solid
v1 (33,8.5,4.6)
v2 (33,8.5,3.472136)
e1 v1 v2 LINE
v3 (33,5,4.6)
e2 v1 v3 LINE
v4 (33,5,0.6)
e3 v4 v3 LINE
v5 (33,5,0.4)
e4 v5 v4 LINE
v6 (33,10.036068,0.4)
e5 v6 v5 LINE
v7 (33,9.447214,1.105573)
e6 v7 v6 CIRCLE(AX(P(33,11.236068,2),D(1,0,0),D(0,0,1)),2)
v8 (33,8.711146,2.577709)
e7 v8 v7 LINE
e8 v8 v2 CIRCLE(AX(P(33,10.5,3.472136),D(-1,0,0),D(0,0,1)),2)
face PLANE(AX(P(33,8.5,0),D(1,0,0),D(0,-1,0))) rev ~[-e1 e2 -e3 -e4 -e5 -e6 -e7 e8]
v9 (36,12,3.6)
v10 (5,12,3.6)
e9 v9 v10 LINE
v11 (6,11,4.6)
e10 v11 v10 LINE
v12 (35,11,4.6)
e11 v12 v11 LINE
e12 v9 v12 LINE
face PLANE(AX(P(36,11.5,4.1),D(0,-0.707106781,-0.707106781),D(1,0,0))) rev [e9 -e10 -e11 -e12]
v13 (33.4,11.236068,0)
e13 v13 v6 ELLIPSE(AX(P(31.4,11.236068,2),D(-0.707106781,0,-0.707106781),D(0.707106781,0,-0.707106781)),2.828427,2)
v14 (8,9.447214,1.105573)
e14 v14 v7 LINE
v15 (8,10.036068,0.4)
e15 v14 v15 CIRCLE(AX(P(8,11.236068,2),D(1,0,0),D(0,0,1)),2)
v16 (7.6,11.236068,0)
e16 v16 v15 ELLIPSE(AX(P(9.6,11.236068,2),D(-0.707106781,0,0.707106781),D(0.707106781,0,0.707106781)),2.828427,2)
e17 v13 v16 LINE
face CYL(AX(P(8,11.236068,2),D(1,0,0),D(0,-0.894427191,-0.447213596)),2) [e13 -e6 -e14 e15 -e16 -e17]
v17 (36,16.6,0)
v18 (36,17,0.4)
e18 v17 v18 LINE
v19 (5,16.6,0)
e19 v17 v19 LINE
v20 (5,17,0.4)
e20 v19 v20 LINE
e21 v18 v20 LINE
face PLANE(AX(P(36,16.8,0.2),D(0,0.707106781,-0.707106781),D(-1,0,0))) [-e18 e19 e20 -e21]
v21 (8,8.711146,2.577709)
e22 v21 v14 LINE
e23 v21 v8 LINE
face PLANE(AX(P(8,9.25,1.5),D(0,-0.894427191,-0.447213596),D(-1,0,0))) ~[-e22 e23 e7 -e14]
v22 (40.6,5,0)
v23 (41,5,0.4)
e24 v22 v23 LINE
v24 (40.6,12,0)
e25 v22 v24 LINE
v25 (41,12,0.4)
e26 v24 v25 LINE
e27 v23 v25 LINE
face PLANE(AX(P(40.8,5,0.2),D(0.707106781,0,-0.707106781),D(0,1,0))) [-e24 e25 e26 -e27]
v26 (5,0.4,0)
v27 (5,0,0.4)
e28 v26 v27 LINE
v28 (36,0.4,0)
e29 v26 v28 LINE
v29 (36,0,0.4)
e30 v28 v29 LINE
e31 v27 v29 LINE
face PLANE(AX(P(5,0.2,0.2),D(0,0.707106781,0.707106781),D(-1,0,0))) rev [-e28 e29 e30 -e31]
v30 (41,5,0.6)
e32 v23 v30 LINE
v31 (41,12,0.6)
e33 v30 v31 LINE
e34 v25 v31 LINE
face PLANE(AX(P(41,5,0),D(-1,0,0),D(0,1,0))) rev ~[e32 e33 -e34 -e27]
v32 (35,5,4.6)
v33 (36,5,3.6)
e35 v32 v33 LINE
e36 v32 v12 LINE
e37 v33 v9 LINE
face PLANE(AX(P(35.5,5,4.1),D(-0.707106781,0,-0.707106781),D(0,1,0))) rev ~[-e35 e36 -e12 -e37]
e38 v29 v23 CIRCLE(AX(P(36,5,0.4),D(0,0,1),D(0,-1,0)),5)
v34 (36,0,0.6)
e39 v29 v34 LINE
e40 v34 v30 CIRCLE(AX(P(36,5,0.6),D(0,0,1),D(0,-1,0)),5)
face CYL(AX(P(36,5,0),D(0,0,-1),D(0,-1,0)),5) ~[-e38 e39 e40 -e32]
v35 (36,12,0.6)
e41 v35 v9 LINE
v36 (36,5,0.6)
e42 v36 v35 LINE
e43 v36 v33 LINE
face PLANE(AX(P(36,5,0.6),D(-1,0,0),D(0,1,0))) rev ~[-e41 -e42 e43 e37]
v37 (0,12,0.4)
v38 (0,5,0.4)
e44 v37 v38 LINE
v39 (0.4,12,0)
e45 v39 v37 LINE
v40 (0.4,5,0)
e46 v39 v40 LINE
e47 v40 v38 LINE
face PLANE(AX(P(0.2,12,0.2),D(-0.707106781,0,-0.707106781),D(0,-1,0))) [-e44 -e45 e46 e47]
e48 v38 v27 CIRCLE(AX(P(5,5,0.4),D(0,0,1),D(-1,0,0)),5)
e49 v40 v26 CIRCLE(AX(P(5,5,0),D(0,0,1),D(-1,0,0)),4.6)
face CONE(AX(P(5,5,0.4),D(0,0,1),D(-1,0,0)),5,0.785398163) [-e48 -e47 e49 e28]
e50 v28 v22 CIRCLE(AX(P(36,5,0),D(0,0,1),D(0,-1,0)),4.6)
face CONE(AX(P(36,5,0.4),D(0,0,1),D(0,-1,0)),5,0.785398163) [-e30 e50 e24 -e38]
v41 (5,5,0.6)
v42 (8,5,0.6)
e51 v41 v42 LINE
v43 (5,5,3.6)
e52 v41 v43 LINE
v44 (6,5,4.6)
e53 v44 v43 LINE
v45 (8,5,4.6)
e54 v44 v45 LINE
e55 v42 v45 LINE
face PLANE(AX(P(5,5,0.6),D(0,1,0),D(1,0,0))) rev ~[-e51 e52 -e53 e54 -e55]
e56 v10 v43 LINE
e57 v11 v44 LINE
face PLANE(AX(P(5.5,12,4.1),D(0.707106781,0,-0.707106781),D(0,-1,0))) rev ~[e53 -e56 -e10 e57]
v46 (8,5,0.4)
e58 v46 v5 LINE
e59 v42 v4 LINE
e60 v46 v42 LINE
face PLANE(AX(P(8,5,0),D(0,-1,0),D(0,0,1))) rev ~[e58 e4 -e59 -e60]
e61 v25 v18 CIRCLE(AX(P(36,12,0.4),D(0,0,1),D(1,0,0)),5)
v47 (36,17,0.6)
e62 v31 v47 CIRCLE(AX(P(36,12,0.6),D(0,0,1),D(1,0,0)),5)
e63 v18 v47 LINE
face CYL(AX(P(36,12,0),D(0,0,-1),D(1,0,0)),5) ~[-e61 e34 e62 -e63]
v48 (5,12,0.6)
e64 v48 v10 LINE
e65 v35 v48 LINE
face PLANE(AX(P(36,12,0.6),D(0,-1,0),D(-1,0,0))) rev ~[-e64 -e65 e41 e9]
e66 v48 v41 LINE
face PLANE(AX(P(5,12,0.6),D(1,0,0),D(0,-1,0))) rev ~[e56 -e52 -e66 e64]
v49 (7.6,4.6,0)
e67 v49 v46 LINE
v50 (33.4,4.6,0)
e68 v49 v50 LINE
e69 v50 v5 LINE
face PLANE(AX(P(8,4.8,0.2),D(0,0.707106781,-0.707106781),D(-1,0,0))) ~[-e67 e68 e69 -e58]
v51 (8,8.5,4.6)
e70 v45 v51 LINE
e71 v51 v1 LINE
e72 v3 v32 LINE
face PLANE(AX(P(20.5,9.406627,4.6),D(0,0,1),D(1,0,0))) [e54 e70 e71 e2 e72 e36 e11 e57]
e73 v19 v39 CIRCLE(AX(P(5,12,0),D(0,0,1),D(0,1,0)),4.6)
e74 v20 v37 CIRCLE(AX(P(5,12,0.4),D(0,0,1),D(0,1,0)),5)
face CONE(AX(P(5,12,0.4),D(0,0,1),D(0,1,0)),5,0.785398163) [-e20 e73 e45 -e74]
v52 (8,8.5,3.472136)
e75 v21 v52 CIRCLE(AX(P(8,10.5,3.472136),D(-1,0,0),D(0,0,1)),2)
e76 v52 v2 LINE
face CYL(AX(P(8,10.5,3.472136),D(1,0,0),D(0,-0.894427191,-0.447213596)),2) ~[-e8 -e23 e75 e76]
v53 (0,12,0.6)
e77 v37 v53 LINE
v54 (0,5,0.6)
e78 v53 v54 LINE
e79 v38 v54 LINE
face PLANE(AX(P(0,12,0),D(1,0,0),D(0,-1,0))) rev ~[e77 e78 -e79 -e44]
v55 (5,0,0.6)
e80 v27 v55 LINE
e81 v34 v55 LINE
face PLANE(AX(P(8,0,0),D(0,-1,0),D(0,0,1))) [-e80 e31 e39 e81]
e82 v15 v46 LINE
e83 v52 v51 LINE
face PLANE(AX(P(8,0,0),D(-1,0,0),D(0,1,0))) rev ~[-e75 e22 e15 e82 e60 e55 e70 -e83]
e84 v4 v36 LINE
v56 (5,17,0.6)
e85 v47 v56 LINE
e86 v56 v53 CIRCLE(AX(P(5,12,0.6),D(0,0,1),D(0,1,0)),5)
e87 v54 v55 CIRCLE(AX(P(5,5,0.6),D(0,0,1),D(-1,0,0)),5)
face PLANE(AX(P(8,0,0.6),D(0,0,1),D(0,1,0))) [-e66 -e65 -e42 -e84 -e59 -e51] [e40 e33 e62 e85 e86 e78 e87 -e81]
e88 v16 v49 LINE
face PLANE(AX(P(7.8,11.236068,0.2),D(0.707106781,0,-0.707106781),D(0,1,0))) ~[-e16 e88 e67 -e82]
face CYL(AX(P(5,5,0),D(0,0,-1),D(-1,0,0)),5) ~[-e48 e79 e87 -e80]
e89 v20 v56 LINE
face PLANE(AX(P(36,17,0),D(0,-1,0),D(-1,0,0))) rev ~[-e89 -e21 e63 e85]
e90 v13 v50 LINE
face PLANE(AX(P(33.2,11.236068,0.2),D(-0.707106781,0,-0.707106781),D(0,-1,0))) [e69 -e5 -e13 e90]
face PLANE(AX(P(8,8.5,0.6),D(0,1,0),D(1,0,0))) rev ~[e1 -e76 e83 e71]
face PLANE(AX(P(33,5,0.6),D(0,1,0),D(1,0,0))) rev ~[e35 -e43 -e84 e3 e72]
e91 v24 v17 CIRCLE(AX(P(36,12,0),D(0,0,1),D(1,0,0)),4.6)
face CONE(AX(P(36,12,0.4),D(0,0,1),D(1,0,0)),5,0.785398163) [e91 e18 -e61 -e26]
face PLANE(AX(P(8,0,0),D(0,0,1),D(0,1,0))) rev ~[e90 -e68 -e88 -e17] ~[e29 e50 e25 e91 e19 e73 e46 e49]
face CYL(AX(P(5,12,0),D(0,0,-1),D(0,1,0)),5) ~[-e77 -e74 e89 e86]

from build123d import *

# Parameters (mm, degrees)
F1_DEPTH = 0.6
F3_DEPTH = 4
F4_SIZE  = 1
F5_SIZE2 = 1.5
F5_SIZE  = 3
F6_R     = 2
F7_W     = 5
F7_H     = 0.6
F8_DEPTH = 25
F9_SIZE  = 0.4


with BuildPart() as f1:
    # F0 (on Top) → F1 (new body)
    with BuildSketch(Plane.XY):
        with BuildLine():
            ThreePointArc((0, 5), (1.4644660941, 1.4644660941), (5, 0))
            Line((5, 0), (8, 0))
            Line((8, 0), (8, 8.5))
            Line((8, 8.5), (33, 8.5))
            Line((33, 8.5), (33, 0))
            Line((33, 0), (36, 0))
            ThreePointArc((36, 0), (39.5355339059, 1.4644660941), (41, 5))
            Line((41, 5), (41, 12))
            ThreePointArc((41, 12), (39.5355339059, 15.5355339059), (36, 17))
            Line((36, 17), (5, 17))
            ThreePointArc((5, 17), (1.4644660941, 15.5355339059), (0, 12))
            Line((0, 12), (0, 5))
        make_face()
    extrude(amount=F1_DEPTH)

    # F2 (on face) → F3 (join)
    with BuildSketch(Plane.XY.offset(0.6)):
        Polygon((36, 12), (5, 12), (5, 5), (8, 5), (8, 8.5), (33, 8.5), (33, 5), (36, 5), align=None)
    extrude(amount=F3_DEPTH)

    # F4
    f4_edges = [f1.edges().sort_by_distance(p)[0] for p in [
        (5, 8.5, 4.6),
        (20.5, 12, 4.6),
        (36, 8.5, 4.6),
    ]]
    chamfer(f4_edges, length=F4_SIZE)

    # F5
    f5_edges = [f1.edges().sort_by_distance(p)[0] for p in [
        (20.5, 8.5, 0),
    ]]
    f5_side = f1.faces().sort_by_distance((20.5, 8.5, 2.3))[0]
    chamfer(f5_edges, length=F5_SIZE, length2=F5_SIZE2, reference=f5_side)

    # F6
    f6_edges = [f1.edges().sort_by_distance(p)[0] for p in [
        (20.5, 10, 0),
        (20.5, 8.5, 3),
    ]]
    fillet(f6_edges, radius=F6_R)

    # F7 (on face) → F8 (join, through all)
    with BuildSketch(Plane.YZ.offset(8)):
        with Locations((2.5, 0.3)):
            Rectangle(F7_W, F7_H)
    extrude(amount=F8_DEPTH)

    # F9
    f9_edges = [f1.edges().sort_by_distance(p)[0] for p in [
        (20.5, 17, 0),
        (20.5, 5, 0),
        (8, 8.118034, 0),
        (41, 8.5, 0),
        (39.535534, 1.464466, 0),
        (20.5, 0, 0),
        (1.464466, 1.464466, 0),
        (0, 8.5, 0),
        (1.464466, 15.535534, 0),
        (39.535534, 15.535534, 0),
        (33, 8.118034, 0),
    ]]
    chamfer(f9_edges, length=F9_SIZE)


solid = f1.part
